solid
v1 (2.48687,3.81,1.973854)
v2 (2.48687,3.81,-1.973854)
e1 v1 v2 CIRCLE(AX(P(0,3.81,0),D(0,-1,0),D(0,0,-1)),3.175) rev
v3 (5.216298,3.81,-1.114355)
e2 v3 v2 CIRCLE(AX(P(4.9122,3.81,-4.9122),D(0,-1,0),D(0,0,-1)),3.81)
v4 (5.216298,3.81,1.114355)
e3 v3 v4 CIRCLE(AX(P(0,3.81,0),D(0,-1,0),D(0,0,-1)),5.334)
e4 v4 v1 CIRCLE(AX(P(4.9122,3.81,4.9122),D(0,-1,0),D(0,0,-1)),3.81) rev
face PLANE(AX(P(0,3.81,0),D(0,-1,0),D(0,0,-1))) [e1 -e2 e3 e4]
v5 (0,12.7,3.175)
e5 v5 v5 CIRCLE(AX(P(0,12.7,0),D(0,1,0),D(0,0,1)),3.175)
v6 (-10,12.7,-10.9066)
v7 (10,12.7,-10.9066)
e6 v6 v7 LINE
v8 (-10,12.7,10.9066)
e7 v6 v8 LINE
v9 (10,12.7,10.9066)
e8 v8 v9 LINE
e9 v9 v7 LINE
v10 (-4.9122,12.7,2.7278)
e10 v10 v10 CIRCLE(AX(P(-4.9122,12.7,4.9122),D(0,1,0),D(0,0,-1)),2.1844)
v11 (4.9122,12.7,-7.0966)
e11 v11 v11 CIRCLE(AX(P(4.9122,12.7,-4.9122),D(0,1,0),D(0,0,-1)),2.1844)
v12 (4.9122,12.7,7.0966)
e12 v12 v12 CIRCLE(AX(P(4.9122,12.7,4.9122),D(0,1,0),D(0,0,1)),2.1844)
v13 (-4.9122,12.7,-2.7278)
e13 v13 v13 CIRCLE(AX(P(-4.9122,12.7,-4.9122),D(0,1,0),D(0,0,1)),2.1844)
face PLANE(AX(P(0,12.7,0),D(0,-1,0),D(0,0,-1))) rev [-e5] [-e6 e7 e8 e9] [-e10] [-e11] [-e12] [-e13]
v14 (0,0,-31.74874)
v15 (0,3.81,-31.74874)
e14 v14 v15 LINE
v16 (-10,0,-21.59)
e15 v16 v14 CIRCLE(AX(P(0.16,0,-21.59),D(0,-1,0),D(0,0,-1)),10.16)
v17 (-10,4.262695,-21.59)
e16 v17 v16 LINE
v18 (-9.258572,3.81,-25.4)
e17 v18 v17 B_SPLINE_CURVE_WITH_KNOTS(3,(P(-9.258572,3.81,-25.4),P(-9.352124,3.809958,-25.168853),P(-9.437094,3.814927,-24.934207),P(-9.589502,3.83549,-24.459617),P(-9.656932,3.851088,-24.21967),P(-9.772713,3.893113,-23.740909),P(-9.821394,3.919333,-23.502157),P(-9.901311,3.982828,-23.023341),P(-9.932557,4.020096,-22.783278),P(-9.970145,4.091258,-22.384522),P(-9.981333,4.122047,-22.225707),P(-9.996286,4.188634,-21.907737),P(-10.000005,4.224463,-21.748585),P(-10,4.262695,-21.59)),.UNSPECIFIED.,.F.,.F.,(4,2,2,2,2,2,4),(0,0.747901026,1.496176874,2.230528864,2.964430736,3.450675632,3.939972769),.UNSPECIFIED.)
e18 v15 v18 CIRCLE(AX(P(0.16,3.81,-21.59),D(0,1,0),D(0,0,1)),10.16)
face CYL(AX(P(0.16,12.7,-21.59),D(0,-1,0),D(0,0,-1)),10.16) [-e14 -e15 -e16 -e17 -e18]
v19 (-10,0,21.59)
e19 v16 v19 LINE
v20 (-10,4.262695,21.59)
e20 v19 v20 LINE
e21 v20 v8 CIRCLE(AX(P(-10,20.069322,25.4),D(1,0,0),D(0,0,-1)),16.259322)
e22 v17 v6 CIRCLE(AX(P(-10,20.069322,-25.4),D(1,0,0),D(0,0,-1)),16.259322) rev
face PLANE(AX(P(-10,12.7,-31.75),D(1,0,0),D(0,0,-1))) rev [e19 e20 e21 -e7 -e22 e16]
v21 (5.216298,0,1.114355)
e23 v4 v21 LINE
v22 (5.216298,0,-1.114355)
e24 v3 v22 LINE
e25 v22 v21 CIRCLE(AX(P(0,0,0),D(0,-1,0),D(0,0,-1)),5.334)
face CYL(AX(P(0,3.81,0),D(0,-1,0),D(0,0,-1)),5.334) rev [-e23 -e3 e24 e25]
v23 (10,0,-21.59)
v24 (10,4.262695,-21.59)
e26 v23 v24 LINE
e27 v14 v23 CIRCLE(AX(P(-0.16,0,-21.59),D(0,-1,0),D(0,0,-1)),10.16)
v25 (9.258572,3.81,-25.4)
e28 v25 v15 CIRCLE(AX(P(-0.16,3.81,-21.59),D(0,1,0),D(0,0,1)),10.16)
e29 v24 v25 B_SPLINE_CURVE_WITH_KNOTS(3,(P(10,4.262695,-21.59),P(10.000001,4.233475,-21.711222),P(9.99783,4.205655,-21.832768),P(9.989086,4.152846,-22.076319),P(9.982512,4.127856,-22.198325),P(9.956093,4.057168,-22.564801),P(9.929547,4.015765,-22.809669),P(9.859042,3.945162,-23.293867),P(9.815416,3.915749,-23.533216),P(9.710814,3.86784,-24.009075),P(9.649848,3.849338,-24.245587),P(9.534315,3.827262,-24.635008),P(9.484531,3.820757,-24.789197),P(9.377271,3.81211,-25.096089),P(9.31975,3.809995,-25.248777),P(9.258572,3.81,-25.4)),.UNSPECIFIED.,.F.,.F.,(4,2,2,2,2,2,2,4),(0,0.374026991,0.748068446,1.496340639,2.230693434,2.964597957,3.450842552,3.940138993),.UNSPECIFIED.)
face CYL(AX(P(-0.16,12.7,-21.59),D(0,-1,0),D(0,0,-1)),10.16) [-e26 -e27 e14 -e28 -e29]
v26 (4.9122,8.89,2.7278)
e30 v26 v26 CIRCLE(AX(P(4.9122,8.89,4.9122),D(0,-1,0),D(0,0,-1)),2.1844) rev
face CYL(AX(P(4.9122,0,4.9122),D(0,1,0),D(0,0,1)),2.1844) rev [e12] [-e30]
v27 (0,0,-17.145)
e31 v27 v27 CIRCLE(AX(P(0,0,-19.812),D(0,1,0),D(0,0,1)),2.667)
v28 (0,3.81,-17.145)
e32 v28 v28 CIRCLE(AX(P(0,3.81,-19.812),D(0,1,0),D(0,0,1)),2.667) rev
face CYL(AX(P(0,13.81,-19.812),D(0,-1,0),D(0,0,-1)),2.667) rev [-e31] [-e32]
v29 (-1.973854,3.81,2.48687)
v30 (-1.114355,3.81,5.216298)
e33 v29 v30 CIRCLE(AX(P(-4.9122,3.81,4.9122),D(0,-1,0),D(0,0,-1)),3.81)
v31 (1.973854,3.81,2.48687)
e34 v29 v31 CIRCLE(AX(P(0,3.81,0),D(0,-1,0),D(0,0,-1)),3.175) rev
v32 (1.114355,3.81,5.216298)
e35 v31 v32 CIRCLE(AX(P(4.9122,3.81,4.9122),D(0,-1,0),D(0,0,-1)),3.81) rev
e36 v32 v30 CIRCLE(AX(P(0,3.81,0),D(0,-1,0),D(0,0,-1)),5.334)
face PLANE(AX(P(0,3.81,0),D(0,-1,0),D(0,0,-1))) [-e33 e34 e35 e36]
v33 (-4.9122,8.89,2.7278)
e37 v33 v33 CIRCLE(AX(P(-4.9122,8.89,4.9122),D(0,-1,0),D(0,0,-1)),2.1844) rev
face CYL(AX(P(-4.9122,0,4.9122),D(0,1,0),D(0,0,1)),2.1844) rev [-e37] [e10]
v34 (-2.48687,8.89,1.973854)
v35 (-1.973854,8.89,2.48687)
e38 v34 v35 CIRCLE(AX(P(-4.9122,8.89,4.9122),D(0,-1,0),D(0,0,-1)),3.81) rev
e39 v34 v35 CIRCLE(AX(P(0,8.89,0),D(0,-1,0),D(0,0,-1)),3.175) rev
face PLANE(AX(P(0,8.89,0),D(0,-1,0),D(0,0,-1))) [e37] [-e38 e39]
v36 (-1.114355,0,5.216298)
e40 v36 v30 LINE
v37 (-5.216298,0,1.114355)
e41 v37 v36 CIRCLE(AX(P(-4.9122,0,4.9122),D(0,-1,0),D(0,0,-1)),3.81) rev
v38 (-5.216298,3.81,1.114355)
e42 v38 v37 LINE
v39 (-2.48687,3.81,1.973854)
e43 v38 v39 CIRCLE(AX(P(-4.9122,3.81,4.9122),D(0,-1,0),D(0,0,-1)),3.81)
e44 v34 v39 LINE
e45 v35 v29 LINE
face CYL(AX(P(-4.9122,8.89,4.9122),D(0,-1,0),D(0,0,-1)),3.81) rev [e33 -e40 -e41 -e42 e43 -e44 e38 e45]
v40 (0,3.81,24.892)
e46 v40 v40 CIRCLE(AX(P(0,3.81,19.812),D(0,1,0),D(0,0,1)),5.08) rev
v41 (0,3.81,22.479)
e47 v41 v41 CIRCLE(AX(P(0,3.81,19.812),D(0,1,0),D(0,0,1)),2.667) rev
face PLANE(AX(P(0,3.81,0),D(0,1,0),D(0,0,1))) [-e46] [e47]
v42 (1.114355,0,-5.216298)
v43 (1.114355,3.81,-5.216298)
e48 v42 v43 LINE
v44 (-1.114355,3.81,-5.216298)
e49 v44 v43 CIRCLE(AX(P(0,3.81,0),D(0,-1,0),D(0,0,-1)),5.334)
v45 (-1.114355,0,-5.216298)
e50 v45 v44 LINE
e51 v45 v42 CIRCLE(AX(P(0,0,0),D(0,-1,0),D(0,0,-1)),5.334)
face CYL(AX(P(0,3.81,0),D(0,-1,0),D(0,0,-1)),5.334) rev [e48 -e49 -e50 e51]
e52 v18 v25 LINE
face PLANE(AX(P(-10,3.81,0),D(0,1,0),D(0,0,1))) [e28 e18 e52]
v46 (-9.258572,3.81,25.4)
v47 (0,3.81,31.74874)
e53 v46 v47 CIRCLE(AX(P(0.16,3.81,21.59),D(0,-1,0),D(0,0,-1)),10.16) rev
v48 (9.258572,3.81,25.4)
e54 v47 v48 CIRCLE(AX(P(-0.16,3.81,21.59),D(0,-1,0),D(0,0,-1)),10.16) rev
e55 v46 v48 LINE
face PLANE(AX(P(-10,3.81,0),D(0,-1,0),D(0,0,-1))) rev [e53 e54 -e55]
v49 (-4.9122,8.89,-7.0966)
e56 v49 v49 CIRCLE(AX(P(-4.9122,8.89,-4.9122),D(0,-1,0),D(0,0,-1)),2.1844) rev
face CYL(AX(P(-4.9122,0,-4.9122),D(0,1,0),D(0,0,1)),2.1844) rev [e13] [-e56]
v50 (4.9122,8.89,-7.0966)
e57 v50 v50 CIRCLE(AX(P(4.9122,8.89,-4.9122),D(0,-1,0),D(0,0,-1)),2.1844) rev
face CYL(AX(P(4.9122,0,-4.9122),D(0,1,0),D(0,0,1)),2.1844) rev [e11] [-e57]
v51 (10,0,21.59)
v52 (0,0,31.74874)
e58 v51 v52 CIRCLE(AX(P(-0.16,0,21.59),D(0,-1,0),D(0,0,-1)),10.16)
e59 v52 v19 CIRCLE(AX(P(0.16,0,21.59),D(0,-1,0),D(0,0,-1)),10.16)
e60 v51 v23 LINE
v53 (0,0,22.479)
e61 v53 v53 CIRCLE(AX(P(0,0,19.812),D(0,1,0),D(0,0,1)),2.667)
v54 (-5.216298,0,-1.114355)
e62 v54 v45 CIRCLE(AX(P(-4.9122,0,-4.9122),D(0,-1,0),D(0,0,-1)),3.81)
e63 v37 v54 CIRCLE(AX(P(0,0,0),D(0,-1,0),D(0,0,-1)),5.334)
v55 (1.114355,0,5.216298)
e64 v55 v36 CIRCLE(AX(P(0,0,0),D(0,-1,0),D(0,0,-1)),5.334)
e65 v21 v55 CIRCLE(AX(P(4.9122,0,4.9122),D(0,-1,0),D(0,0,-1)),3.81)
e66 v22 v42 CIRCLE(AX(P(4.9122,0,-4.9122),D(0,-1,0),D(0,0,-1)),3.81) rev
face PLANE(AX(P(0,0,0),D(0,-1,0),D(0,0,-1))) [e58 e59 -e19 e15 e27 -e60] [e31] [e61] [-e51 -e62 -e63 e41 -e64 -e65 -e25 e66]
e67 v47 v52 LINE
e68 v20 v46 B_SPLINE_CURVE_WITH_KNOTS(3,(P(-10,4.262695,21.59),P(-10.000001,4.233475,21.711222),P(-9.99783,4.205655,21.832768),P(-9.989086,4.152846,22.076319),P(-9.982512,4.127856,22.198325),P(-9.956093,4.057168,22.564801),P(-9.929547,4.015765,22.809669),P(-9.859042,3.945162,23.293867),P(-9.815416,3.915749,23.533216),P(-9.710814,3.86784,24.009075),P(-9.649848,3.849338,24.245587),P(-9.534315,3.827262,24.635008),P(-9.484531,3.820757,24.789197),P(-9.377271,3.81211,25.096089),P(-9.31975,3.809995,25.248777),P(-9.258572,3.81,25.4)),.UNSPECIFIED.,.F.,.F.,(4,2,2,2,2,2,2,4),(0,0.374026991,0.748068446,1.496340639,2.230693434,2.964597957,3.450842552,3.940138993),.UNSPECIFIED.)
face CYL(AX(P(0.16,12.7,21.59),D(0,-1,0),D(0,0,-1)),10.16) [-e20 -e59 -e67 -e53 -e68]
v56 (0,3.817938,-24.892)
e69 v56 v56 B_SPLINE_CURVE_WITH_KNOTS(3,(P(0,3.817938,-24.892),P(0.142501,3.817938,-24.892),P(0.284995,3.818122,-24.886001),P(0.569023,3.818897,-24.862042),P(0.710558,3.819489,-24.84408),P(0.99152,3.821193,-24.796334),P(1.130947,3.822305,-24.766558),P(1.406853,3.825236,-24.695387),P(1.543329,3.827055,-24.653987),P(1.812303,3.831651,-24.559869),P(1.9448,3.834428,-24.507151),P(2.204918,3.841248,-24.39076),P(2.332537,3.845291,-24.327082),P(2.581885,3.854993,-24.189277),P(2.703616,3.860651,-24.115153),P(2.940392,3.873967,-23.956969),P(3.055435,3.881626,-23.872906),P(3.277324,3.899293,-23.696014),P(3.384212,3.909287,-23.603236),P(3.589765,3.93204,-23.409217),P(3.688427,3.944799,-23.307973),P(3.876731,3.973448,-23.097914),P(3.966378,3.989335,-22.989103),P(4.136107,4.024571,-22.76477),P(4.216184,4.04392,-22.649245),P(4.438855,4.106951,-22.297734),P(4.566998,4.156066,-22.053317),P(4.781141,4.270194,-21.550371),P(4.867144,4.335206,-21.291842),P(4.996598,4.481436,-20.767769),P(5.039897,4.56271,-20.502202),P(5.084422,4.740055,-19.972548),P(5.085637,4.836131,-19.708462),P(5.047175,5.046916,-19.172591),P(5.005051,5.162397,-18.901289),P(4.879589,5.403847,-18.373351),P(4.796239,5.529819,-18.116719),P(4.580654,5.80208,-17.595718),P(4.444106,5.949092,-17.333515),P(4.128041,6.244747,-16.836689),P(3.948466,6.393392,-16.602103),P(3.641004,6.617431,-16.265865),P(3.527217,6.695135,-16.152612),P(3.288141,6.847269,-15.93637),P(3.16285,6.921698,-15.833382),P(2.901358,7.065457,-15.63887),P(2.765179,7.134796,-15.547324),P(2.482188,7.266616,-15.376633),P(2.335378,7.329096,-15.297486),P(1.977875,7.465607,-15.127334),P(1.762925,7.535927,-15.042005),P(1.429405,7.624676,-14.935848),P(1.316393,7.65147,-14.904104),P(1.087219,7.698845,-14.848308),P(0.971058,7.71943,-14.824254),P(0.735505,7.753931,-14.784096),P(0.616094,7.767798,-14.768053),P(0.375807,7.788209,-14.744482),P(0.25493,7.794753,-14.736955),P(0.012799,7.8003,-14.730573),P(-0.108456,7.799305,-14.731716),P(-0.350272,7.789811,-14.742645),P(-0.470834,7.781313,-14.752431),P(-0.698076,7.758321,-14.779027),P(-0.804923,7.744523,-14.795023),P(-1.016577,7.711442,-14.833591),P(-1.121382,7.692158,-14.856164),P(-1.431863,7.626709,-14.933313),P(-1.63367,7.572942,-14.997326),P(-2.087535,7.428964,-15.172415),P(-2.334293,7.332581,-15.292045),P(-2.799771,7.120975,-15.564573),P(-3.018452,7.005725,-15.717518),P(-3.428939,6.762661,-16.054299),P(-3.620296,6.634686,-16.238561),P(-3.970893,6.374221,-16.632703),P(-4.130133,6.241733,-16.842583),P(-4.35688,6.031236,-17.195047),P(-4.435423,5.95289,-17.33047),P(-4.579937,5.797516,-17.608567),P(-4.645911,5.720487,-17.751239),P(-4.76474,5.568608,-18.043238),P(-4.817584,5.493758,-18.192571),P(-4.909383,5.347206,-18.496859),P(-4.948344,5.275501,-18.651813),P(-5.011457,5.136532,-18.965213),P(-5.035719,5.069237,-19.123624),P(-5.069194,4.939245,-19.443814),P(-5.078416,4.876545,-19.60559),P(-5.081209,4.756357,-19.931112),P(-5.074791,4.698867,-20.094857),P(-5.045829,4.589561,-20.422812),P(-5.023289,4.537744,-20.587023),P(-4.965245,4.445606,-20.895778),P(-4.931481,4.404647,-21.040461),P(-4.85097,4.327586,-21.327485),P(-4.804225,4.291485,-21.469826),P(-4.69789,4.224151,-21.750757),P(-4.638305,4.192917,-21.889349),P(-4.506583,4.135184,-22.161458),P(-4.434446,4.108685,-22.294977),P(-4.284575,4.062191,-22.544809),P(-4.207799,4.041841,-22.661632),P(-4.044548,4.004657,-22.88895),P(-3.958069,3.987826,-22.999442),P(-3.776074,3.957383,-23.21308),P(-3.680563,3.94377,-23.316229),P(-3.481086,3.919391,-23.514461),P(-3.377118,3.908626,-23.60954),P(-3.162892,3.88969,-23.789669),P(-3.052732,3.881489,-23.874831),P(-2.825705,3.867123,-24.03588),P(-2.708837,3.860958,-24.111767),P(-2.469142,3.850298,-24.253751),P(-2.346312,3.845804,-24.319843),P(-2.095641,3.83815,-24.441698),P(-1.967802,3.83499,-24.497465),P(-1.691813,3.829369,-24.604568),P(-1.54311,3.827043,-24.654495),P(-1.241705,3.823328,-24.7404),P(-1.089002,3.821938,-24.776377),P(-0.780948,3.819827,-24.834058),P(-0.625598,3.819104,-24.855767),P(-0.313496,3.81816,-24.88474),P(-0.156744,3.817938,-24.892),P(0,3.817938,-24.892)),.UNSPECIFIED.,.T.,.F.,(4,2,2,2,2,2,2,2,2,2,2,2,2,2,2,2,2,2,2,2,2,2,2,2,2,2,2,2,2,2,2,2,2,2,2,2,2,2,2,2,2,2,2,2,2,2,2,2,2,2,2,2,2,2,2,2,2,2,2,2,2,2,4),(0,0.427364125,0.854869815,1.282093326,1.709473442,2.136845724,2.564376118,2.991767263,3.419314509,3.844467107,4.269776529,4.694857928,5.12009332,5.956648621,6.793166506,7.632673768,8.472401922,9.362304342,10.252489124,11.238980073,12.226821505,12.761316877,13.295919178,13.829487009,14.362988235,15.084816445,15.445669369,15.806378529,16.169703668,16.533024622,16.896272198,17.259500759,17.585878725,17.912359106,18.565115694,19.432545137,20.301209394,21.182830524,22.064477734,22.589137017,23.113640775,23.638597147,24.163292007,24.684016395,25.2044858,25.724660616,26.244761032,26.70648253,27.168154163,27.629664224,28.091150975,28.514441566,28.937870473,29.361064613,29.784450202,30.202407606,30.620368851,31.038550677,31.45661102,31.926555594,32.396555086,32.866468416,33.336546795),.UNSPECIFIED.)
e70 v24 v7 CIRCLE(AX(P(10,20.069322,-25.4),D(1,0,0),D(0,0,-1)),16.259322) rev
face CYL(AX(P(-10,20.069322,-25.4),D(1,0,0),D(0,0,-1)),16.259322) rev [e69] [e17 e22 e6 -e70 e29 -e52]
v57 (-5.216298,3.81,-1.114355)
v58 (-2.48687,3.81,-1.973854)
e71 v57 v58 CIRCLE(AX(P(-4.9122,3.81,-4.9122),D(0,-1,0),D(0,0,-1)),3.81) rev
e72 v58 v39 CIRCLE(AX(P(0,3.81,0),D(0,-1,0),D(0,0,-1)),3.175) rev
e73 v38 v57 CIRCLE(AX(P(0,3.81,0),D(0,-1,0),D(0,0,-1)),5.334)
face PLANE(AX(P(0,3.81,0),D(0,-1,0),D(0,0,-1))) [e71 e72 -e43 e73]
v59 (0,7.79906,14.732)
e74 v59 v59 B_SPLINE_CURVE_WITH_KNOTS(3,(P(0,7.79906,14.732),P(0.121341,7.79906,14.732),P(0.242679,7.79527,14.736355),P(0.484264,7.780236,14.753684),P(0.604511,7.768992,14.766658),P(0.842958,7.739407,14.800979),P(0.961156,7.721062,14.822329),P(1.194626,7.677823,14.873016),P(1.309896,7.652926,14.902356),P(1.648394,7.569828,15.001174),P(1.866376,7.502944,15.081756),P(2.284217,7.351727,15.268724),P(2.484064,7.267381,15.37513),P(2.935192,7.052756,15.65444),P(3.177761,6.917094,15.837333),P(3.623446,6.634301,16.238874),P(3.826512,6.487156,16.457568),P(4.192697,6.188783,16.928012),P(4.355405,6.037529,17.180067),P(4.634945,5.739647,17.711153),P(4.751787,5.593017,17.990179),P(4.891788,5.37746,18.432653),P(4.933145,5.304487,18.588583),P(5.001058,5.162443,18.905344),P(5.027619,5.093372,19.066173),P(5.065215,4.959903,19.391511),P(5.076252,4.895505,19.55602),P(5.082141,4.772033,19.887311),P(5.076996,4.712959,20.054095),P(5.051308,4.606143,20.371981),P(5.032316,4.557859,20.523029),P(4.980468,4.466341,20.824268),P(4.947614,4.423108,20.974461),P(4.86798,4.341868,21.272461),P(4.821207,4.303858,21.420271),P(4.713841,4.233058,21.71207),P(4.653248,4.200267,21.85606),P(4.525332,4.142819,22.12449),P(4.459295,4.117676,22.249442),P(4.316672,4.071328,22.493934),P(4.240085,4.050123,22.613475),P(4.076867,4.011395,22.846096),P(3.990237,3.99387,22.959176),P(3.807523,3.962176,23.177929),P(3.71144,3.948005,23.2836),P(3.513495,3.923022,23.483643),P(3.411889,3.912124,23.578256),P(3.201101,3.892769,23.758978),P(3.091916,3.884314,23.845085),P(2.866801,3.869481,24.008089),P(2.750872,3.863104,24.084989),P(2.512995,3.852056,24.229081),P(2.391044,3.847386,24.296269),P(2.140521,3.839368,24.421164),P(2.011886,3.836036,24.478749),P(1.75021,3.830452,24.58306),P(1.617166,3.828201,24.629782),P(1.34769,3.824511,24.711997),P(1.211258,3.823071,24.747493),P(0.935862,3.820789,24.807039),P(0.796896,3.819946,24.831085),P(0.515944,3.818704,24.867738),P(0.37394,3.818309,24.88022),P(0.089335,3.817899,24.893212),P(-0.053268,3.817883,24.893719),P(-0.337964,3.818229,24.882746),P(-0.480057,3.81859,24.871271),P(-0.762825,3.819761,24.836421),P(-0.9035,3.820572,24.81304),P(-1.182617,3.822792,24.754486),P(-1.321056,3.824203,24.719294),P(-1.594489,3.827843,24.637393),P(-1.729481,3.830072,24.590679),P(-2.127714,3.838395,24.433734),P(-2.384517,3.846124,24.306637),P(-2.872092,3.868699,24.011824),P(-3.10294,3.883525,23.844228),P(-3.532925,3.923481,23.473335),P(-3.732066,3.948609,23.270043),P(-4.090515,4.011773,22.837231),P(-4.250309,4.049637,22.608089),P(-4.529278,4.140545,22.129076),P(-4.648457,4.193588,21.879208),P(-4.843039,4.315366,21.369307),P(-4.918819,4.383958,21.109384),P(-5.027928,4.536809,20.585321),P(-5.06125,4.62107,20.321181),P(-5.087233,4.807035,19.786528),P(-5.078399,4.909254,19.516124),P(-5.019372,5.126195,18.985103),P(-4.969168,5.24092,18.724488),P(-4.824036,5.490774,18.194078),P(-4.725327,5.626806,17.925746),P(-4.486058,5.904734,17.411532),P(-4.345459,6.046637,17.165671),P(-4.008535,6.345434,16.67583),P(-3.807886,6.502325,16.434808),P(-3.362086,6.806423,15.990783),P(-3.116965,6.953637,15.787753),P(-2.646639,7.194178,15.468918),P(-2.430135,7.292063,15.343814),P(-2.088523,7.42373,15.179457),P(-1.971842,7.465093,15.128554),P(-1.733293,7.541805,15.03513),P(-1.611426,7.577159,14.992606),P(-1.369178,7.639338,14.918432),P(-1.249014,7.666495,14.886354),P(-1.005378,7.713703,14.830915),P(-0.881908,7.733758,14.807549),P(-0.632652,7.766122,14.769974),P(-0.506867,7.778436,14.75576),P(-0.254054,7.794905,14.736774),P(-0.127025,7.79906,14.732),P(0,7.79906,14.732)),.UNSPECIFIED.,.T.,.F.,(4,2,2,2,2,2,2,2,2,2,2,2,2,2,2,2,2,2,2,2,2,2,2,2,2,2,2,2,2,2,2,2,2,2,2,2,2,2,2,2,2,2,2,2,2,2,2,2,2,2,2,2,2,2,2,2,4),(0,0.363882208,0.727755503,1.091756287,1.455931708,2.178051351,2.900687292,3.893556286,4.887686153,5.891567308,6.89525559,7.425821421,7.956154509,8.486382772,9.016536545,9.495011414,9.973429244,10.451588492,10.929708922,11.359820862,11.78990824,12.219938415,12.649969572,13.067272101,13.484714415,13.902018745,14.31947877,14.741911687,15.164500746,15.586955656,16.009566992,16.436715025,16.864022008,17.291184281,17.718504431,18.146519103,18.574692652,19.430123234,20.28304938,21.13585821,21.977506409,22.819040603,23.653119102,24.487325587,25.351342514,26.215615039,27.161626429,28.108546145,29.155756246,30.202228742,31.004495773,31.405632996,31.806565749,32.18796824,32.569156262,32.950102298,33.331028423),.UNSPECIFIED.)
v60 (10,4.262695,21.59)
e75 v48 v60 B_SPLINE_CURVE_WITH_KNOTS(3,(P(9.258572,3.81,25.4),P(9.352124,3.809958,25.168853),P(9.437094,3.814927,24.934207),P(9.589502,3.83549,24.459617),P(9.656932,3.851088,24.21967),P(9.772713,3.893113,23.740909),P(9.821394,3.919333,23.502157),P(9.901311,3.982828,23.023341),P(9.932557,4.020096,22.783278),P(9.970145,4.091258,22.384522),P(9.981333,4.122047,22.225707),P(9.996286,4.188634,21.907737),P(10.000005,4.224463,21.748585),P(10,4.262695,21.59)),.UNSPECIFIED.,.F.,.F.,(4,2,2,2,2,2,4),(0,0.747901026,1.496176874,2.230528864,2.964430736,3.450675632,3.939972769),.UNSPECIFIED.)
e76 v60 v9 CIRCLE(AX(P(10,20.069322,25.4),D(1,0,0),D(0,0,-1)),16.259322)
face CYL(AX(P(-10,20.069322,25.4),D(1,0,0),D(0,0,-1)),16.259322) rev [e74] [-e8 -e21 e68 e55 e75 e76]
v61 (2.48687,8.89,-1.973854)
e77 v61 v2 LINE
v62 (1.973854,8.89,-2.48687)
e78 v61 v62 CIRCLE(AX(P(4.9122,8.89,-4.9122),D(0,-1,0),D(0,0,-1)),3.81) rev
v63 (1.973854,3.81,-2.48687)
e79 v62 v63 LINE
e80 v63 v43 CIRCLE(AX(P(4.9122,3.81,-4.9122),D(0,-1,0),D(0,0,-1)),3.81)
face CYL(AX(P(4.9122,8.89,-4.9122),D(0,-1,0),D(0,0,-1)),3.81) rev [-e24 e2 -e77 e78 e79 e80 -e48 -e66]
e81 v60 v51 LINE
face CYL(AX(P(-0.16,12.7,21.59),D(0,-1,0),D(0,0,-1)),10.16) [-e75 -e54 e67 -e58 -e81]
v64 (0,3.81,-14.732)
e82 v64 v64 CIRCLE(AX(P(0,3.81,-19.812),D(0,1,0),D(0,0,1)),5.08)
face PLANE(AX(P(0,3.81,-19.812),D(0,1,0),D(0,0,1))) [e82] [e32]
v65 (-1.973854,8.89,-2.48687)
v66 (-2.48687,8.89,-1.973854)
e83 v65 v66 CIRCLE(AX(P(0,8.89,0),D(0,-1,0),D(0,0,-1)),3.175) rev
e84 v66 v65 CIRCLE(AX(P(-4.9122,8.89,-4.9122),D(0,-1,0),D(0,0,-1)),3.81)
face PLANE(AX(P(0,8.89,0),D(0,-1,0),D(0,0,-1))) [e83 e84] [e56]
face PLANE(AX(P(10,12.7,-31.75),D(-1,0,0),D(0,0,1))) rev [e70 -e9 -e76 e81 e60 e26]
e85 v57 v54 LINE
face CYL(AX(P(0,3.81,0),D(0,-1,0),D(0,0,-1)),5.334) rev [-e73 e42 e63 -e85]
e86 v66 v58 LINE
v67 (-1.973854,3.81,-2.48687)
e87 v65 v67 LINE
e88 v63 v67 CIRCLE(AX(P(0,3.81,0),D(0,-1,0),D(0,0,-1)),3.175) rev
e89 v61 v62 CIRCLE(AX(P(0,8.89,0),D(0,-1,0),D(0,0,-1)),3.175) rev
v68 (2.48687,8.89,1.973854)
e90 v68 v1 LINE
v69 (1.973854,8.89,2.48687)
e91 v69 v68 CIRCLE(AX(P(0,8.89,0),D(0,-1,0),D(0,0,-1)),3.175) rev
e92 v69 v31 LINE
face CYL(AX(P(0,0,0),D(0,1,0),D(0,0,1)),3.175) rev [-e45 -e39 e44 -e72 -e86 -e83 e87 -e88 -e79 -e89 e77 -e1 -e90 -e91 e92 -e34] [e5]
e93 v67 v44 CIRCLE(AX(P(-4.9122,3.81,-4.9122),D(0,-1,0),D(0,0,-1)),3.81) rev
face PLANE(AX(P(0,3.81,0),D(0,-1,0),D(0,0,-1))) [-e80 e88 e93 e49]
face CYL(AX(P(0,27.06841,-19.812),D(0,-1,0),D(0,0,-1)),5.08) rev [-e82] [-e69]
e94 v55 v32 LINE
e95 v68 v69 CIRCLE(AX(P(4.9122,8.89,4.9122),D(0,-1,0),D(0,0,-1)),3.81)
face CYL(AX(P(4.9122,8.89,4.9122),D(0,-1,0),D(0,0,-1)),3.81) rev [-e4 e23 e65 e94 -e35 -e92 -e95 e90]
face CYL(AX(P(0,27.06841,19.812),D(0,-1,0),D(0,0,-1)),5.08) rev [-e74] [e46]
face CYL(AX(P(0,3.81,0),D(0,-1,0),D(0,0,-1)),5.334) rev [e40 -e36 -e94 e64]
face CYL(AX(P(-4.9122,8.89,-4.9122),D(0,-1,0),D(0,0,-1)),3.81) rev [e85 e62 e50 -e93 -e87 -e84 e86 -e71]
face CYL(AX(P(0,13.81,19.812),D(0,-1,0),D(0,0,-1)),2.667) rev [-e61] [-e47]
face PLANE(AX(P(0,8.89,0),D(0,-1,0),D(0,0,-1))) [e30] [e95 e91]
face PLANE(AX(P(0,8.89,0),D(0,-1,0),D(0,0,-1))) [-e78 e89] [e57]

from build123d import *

# Parameters (mm, degrees)
SKETCH1_W               = 20
SKETCH1_H               = 63.5
BOSS_EXTRUDE1_DEPTH     = 12.7
SKETCH2_R               = 3.175
SKETCH2_R_2             = 2.1844
CUT_EXTRUDE1_DEPTH      = 36.62797356
CUT_EXTRUDE2_DEPTH      = 36.62797356
CUT_EXTRUDE2_DEPTH_BACK = 36.62797356
SKETCH4_R               = 3.81
CUT_EXTRUDE3_DEPTH      = 8.89
SKETCH4_3_R             = 3.81
SKETCH4_3_R_2           = 2.1844
SKETCH4_3_R_3           = 5.334
SKETCH4_3_R_4           = 3.175
CUT_EXTRUDE4_DEPTH      = 3.81
CUT_EXTRUDE5_REACH      = 36.454
SKETCH6_R               = 5.08
SKETCH6_R_2             = 2.667
CUT_EXTRUDE6_DEPTH      = 10
CUT_EXTRUDE6_DEPTH_BACK = 35.454239272
SKETCH6_4_R             = 2.159
SKETCH6_4_R_2           = 2.667
FILLET1_R               = 10.16


with BuildPart() as part:
    # Sketch1 → Boss-Extrude1 (new body)
    with BuildSketch(Plane(origin=(0, 0, 0), x_dir=(1, 0, 0), z_dir=(0, 1, 0))):
        Rectangle(SKETCH1_W, SKETCH1_H)
    extrude(amount=BOSS_EXTRUDE1_DEPTH)

    # Sketch2 → Cut-Extrude1 (cut, through all)
    with BuildSketch(Plane(origin=(0, 12.7, 0), x_dir=(1, 0, 0), z_dir=(0, 1, 0))):
        with Locations(Location((0, 0, 0), (0, 0, 270))):
            Circle(SKETCH2_R)
        with Locations(Location((-4.912200098, 4.912200098, 0), (0, 0, 270))):
            Circle(SKETCH2_R_2)
        with Locations(Location((4.912200098, -4.912200098, 0), (0, 0, 270))):
            Circle(SKETCH2_R_2)
        with Locations(Location((4.912200098, 4.912200098, 0), (0, 0, 90))):
            Circle(SKETCH2_R_2)
        with Locations(Location((-4.912200098, -4.912200098, 0), (0, 0, 90))):
            Circle(SKETCH2_R_2)
    extrude(amount=-CUT_EXTRUDE1_DEPTH, mode=Mode.SUBTRACT)

    # Sketch3 → Cut-Extrude2 (cut, two sides: drawn at the far end of the back side and taken through both)
    with BuildSketch(Plane(origin=(0, 0, 0), x_dir=(0, 0, -1), z_dir=(1, 0, 0)).offset(-CUT_EXTRUDE2_DEPTH_BACK)):
        with BuildLine():
            Line((31.75, 3.81), (31.75, 12.7))
            Line((31.75, 12.7), (10.906600098, 12.7))
            ThreePointArc((10.906600098, 12.7), (16.898665682, 6.209564949), (25.4, 3.81))
            Line((25.4, 3.81), (31.75, 3.81))
        make_face()
        with BuildLine():
            ThreePointArc((-25.4, 3.81), (-16.898665682, 6.209564949), (-10.906600098, 12.7))
            Line((-10.906600098, 12.7), (-31.75, 12.7))
            Line((-31.75, 12.7), (-31.75, 3.81))
            Line((-31.75, 3.81), (-25.4, 3.81))
        make_face()
    extrude(amount=CUT_EXTRUDE2_DEPTH + CUT_EXTRUDE2_DEPTH_BACK, mode=Mode.SUBTRACT)

    # Sketch4 → Cut-Extrude3 (cut)
    with BuildSketch(Plane.XZ):
        with Locations((-4.912200098, -4.912200098)):
            Circle(SKETCH4_R)
        with Locations((4.912200098, 4.912200098)):
            Circle(SKETCH4_R)
        with Locations((-4.912200098, 4.912200098)):
            Circle(SKETCH4_R)
        with Locations((4.912200098, -4.912200098)):
            Circle(SKETCH4_R)
    extrude(amount=-CUT_EXTRUDE3_DEPTH, mode=Mode.SUBTRACT)

    # Sketch4<3> → Cut-Extrude4 (cut)
    # profile 1 of 28: a face of its own
    with BuildSketch(Plane.XZ):
        with Locations((-4.912200098, 4.912200098)):
            Circle(SKETCH4_3_R)
        with Locations(Location((-4.912200098, 4.912200098, 0), (0, 0, 270))):
            Circle(SKETCH4_3_R_2, mode=Mode.SUBTRACT)
    # profile 2 of 28: a face of its own
    with BuildSketch(Plane.XZ):
        Circle(SKETCH4_3_R_3)
        with Locations(Location((0, 0, 0), (0, 0, 90))):
            Circle(SKETCH4_3_R_4, mode=Mode.SUBTRACT)
    # profile 3 of 28: a face of its own
    with BuildSketch(Plane.XZ):
        Circle(SKETCH4_3_R_3)
    # profile 4 of 28: a face of its own
    with BuildSketch(Plane.XZ):
        with Locations(Location((-4.912200098, 4.912200098, 0), (0, 0, 270))):
            Circle(SKETCH4_3_R_2)
    # profile 5 of 28: a face of its own
    with BuildSketch(Plane.XZ):
        with Locations((-4.912200098, 4.912200098)):
            Circle(SKETCH4_3_R)
    # profile 6 of 28: a face of its own
    with BuildSketch(Plane.XZ):
        Circle(SKETCH4_3_R_3)
        with Locations(Location((0, 0, 0), (0, 0, 90))):
            Circle(SKETCH4_3_R_4, mode=Mode.SUBTRACT)
    # profile 7 of 28: a face of its own
    with BuildSketch(Plane.XZ):
        with Locations((-4.912200098, -4.912200098)):
            Circle(SKETCH4_3_R)
    # profile 8 of 28: a face of its own
    with BuildSketch(Plane.XZ):
        Circle(SKETCH4_3_R_3)
        with Locations(Location((0, 0, 0), (0, 0, 90))):
            Circle(SKETCH4_3_R_4, mode=Mode.SUBTRACT)
    # profile 9 of 28: a face of its own
    with BuildSketch(Plane.XZ):
        with Locations((-4.912200098, -4.912200098)):
            Circle(SKETCH4_3_R)
        with Locations(Location((-4.912200098, -4.912200098, 0), (0, 0, 90))):
            Circle(SKETCH4_3_R_2, mode=Mode.SUBTRACT)
    # profile 10 of 28: a face of its own
    with BuildSketch(Plane.XZ):
        Circle(SKETCH4_3_R_3)
    # profile 11 of 28: a face of its own
    with BuildSketch(Plane.XZ):
        with Locations(Location((-4.912200098, -4.912200098, 0), (0, 0, 90))):
            Circle(SKETCH4_3_R_2)
    # profile 12 of 28: a face of its own
    with BuildSketch(Plane.XZ):
        with BuildLine():
            ThreePointArc((1.973854475, -2.486870224), (1.04518229, -2.998035854), (0, -3.175))
            Line((0, -3.175), (0, -5.334))
            ThreePointArc((0, -5.334), (0.560277089, -5.304492962), (1.114355409, -5.216298306))
            ThreePointArc((1.114355409, -5.216298306), (1.278123958, -3.767826643), (1.973854475, -2.486870224))
        make_face()
    # profile 13 of 28: a face of its own
    with BuildSketch(Plane.XZ):
        with BuildLine():
            Line((0, -5.334), (0, -3.175))
            ThreePointArc((0, -3.175), (-1.04518229, -2.998035854), (-1.973854475, -2.486870224))
            ThreePointArc((-1.973854475, -2.486870224), (-1.326729639, -3.623595587), (-1.102200098, -4.912200098))
            ThreePointArc((-1.102200098, -4.912200098), (-1.105240139, -5.064370621), (-1.114355409, -5.216298306))
            ThreePointArc((-1.114355409, -5.216298306), (-0.560277089, -5.304492962), (0, -5.334))
        make_face()
    # profile 14 of 28: a face of its own
    with BuildSketch(Plane.XZ):
        with Locations((4.912200098, -4.912200098)):
            Circle(SKETCH4_3_R)
        with Locations(Location((4.912200098, -4.912200098, 0), (0, 0, 270))):
            Circle(SKETCH4_3_R_2, mode=Mode.SUBTRACT)
    # profile 15 of 28: a face of its own
    with BuildSketch(Plane.XZ):
        Circle(SKETCH4_3_R_3)
        with Locations(Location((0, 0, 0), (0, 0, 90))):
            Circle(SKETCH4_3_R_4, mode=Mode.SUBTRACT)
    # profile 16 of 28: a face of its own
    with BuildSketch(Plane.XZ):
        Circle(SKETCH4_3_R_3)
    # profile 17 of 28: a face of its own
    with BuildSketch(Plane.XZ):
        with Locations(Location((4.912200098, -4.912200098, 0), (0, 0, 270))):
            Circle(SKETCH4_3_R_2)
    # profile 18 of 28: a face of its own
    with BuildSketch(Plane.XZ):
        with Locations((4.912200098, -4.912200098)):
            Circle(SKETCH4_3_R)
    # profile 19 of 28: a face of its own
    with BuildSketch(Plane.XZ):
        Circle(SKETCH4_3_R_3)
        with Locations(Location((0, 0, 0), (0, 0, 90))):
            Circle(SKETCH4_3_R_4, mode=Mode.SUBTRACT)
    # profile 20 of 28: a face of its own
    with BuildSketch(Plane.XZ):
        with Locations((4.912200098, 4.912200098)):
            Circle(SKETCH4_3_R)
    # profile 21 of 28: a face of its own
    with BuildSketch(Plane.XZ):
        Circle(SKETCH4_3_R_3)
        with Locations(Location((0, 0, 0), (0, 0, 90))):
            Circle(SKETCH4_3_R_4, mode=Mode.SUBTRACT)
    # profile 22 of 28: a face of its own
    with BuildSketch(Plane.XZ):
        with Locations((4.912200098, 4.912200098)):
            Circle(SKETCH4_3_R)
        with Locations(Location((4.912200098, 4.912200098, 0), (0, 0, 90))):
            Circle(SKETCH4_3_R_2, mode=Mode.SUBTRACT)
    # profile 23 of 28: a face of its own
    with BuildSketch(Plane.XZ):
        Circle(SKETCH4_3_R_3)
    # profile 24 of 28: a face of its own
    with BuildSketch(Plane.XZ):
        with Locations(Location((4.912200098, 4.912200098, 0), (0, 0, 90))):
            Circle(SKETCH4_3_R_2)
    # profile 25 of 28: a face of its own
    with BuildSketch(Plane.XZ):
        with BuildLine():
            Line((0, 3.175), (0, 5.334))
            ThreePointArc((0, 5.334), (-0.560277089, 5.304492962), (-1.114355409, 5.216298306))
            ThreePointArc((-1.114355409, 5.216298306), (-1.105240139, 5.064370621), (-1.102200098, 4.912200098))
            ThreePointArc((-1.102200098, 4.912200098), (-1.326729639, 3.623595587), (-1.973854475, 2.486870224))
            ThreePointArc((-1.973854475, 2.486870224), (-1.04518229, 2.998035854), (0, 3.175))
        make_face()
    # profile 26 of 28: a face of its own
    with BuildSketch(Plane.XZ):
        with BuildLine():
            ThreePointArc((1.114355409, 5.216298306), (0.560277089, 5.304492962), (0, 5.334))
            Line((0, 5.334), (0, 3.175))
            ThreePointArc((0, 3.175), (1.04518229, 2.998035854), (1.973854475, 2.486870224))
            ThreePointArc((1.973854475, 2.486870224), (1.278123958, 3.767826643), (1.114355409, 5.216298306))
        make_face()
    # profile 27 of 28: a face of its own
    with BuildSketch(Plane.XZ):
        with BuildLine():
            ThreePointArc((1.973854475, 2.486870224), (1.04518229, 2.998035854), (0, 3.175))
            Line((0, 3.175), (0, -3.175))
            ThreePointArc((0, -3.175), (1.04518229, -2.998035854), (1.973854475, -2.486870224))
            ThreePointArc((1.973854475, -2.486870224), (2.218123262, -2.218123262), (2.486870224, -1.973854475))
            ThreePointArc((2.486870224, -1.973854475), (2.998035854, -1.04518229), (3.175, 0))
            ThreePointArc((3.175, 0), (2.998035854, 1.04518229), (2.486870224, 1.973854475))
            ThreePointArc((2.486870224, 1.973854475), (2.218123262, 2.218123262), (1.973854475, 2.486870224))
        make_face()
    # profile 28 of 28: a face of its own
    with BuildSketch(Plane.XZ):
        with BuildLine():
            Line((0, -3.175), (0, 3.175))
            ThreePointArc((0, 3.175), (-1.04518229, 2.998035854), (-1.973854475, 2.486870224))
            ThreePointArc((-1.973854475, 2.486870224), (-2.218123262, 2.218123262), (-2.486870224, 1.973854475))
            ThreePointArc((-2.486870224, 1.973854475), (-3.175, 0), (-2.486870224, -1.973854475))
            ThreePointArc((-2.486870224, -1.973854475), (-2.218123262, -2.218123262), (-1.973854475, -2.486870224))
            ThreePointArc((-1.973854475, -2.486870224), (-1.04518229, -2.998035854), (0, -3.175))
        make_face()
    extrude(amount=-CUT_EXTRUDE4_DEPTH, mode=Mode.SUBTRACT)

    # Cut-Extrude5: up to this face of the body (flat: up to its plane)
    cut_extrude5_end = Plane(part.part.faces().sort_by_distance((9.704058164, 12.7, 0))[0])
    # Sketch6 → Cut-Extrude5 (cut, up to the picked face)
    with BuildSketch(Plane(origin=(0, 3.81, 0), x_dir=(1, 0, 0), z_dir=(0, 1, 0)), mode=Mode.PRIVATE) as cut_extrude5_sk1:
        with Locations(Location((0, 19.812, 0), (0, 0, 90))):
            Circle(SKETCH6_R)
    cut_extrude5_tool1 = split(extrude(cut_extrude5_sk1.sketch, amount=CUT_EXTRUDE5_REACH, mode=Mode.PRIVATE), bisect_by=cut_extrude5_end, keep=Keep.BOTH, mode=Mode.PRIVATE)
    # Sketch6 → Cut-Extrude5 (cut, up to the picked face)
    with BuildSketch(Plane(origin=(0, 3.81, 0), x_dir=(1, 0, 0), z_dir=(0, 1, 0)), mode=Mode.PRIVATE) as cut_extrude5_sk2:
        with Locations(Location((0, -19.812, 0), (0, 0, 90))):
            Circle(SKETCH6_R)
        with Locations(Location((0, -19.812, 0), (0, 0, 90))):
            Circle(SKETCH6_R_2, mode=Mode.SUBTRACT)
    cut_extrude5_tool2 = split(extrude(cut_extrude5_sk2.sketch, amount=CUT_EXTRUDE5_REACH, mode=Mode.PRIVATE), bisect_by=cut_extrude5_end, keep=Keep.BOTH, mode=Mode.PRIVATE)
    add(cut_extrude5_tool1.solids().sort_by(Axis((0, 3.81, -19.812), (0, 1, 0)))[0], mode=Mode.SUBTRACT)
    add(cut_extrude5_tool2.solids().sort_by(Axis((0, 3.81, 24.748316), (0, 1, 0)))[0], mode=Mode.SUBTRACT)

    # Sketch6<4> → Cut-Extrude6 (cut, two sides: drawn at the far end of the back side and taken through both)
    with BuildSketch(Plane(origin=(0, 3.81, 0), x_dir=(1, 0, 0), z_dir=(0, 1, 0)).offset(-CUT_EXTRUDE6_DEPTH_BACK)):
        with Locations((0, 19.812)):
            Circle(SKETCH6_4_R)
        with Locations((0, -19.812)):
            Circle(SKETCH6_4_R)
        with Locations(Location((0, 19.812, 0), (0, 0, 270))):
            Circle(SKETCH6_4_R_2)
        with Locations(Location((0, -19.812, 0), (0, 0, 270))):
            Circle(SKETCH6_4_R_2)
    extrude(amount=CUT_EXTRUDE6_DEPTH + CUT_EXTRUDE6_DEPTH_BACK, mode=Mode.SUBTRACT)

    # Fillet1
    # the kernel refuses this fillet: 10.16 mm, written as the material it takes off along each edge
    with BuildSketch(Plane(origin=(10, -25.4, 31.75), x_dir=(0, 0, -1), z_dir=(0, 1, 0)), Plane(origin=(10, -25.4, -31.75), x_dir=(-1, 0, 0), z_dir=(0, 1, 0)), Plane(origin=(-10, -25.4, 31.75), x_dir=(1, 0, 0), z_dir=(0, 1, 0))) as fillet1_piece_1:
        with BuildLine():
            CenterArc((FILLET1_R, FILLET1_R), FILLET1_R, 180, 90)
            Line((0, FILLET1_R), (0, 0))
            Line((0, 0), (FILLET1_R, 0))
        make_face()
    extrude(amount=54.61, mode=Mode.SUBTRACT)
    with BuildSketch(Plane(origin=(-10, -25.4, -31.75), x_dir=(1, 0, 0), z_dir=(0, 1, 0))) as fillet1_piece_2:
        with BuildLine():
            CenterArc((FILLET1_R, -FILLET1_R), FILLET1_R, 90, 90)
            Line((0, -FILLET1_R), (0, 0))
            Line((0, 0), (FILLET1_R, 0))
        make_face()
    extrude(amount=54.61, mode=Mode.SUBTRACT)


solid = part.part
